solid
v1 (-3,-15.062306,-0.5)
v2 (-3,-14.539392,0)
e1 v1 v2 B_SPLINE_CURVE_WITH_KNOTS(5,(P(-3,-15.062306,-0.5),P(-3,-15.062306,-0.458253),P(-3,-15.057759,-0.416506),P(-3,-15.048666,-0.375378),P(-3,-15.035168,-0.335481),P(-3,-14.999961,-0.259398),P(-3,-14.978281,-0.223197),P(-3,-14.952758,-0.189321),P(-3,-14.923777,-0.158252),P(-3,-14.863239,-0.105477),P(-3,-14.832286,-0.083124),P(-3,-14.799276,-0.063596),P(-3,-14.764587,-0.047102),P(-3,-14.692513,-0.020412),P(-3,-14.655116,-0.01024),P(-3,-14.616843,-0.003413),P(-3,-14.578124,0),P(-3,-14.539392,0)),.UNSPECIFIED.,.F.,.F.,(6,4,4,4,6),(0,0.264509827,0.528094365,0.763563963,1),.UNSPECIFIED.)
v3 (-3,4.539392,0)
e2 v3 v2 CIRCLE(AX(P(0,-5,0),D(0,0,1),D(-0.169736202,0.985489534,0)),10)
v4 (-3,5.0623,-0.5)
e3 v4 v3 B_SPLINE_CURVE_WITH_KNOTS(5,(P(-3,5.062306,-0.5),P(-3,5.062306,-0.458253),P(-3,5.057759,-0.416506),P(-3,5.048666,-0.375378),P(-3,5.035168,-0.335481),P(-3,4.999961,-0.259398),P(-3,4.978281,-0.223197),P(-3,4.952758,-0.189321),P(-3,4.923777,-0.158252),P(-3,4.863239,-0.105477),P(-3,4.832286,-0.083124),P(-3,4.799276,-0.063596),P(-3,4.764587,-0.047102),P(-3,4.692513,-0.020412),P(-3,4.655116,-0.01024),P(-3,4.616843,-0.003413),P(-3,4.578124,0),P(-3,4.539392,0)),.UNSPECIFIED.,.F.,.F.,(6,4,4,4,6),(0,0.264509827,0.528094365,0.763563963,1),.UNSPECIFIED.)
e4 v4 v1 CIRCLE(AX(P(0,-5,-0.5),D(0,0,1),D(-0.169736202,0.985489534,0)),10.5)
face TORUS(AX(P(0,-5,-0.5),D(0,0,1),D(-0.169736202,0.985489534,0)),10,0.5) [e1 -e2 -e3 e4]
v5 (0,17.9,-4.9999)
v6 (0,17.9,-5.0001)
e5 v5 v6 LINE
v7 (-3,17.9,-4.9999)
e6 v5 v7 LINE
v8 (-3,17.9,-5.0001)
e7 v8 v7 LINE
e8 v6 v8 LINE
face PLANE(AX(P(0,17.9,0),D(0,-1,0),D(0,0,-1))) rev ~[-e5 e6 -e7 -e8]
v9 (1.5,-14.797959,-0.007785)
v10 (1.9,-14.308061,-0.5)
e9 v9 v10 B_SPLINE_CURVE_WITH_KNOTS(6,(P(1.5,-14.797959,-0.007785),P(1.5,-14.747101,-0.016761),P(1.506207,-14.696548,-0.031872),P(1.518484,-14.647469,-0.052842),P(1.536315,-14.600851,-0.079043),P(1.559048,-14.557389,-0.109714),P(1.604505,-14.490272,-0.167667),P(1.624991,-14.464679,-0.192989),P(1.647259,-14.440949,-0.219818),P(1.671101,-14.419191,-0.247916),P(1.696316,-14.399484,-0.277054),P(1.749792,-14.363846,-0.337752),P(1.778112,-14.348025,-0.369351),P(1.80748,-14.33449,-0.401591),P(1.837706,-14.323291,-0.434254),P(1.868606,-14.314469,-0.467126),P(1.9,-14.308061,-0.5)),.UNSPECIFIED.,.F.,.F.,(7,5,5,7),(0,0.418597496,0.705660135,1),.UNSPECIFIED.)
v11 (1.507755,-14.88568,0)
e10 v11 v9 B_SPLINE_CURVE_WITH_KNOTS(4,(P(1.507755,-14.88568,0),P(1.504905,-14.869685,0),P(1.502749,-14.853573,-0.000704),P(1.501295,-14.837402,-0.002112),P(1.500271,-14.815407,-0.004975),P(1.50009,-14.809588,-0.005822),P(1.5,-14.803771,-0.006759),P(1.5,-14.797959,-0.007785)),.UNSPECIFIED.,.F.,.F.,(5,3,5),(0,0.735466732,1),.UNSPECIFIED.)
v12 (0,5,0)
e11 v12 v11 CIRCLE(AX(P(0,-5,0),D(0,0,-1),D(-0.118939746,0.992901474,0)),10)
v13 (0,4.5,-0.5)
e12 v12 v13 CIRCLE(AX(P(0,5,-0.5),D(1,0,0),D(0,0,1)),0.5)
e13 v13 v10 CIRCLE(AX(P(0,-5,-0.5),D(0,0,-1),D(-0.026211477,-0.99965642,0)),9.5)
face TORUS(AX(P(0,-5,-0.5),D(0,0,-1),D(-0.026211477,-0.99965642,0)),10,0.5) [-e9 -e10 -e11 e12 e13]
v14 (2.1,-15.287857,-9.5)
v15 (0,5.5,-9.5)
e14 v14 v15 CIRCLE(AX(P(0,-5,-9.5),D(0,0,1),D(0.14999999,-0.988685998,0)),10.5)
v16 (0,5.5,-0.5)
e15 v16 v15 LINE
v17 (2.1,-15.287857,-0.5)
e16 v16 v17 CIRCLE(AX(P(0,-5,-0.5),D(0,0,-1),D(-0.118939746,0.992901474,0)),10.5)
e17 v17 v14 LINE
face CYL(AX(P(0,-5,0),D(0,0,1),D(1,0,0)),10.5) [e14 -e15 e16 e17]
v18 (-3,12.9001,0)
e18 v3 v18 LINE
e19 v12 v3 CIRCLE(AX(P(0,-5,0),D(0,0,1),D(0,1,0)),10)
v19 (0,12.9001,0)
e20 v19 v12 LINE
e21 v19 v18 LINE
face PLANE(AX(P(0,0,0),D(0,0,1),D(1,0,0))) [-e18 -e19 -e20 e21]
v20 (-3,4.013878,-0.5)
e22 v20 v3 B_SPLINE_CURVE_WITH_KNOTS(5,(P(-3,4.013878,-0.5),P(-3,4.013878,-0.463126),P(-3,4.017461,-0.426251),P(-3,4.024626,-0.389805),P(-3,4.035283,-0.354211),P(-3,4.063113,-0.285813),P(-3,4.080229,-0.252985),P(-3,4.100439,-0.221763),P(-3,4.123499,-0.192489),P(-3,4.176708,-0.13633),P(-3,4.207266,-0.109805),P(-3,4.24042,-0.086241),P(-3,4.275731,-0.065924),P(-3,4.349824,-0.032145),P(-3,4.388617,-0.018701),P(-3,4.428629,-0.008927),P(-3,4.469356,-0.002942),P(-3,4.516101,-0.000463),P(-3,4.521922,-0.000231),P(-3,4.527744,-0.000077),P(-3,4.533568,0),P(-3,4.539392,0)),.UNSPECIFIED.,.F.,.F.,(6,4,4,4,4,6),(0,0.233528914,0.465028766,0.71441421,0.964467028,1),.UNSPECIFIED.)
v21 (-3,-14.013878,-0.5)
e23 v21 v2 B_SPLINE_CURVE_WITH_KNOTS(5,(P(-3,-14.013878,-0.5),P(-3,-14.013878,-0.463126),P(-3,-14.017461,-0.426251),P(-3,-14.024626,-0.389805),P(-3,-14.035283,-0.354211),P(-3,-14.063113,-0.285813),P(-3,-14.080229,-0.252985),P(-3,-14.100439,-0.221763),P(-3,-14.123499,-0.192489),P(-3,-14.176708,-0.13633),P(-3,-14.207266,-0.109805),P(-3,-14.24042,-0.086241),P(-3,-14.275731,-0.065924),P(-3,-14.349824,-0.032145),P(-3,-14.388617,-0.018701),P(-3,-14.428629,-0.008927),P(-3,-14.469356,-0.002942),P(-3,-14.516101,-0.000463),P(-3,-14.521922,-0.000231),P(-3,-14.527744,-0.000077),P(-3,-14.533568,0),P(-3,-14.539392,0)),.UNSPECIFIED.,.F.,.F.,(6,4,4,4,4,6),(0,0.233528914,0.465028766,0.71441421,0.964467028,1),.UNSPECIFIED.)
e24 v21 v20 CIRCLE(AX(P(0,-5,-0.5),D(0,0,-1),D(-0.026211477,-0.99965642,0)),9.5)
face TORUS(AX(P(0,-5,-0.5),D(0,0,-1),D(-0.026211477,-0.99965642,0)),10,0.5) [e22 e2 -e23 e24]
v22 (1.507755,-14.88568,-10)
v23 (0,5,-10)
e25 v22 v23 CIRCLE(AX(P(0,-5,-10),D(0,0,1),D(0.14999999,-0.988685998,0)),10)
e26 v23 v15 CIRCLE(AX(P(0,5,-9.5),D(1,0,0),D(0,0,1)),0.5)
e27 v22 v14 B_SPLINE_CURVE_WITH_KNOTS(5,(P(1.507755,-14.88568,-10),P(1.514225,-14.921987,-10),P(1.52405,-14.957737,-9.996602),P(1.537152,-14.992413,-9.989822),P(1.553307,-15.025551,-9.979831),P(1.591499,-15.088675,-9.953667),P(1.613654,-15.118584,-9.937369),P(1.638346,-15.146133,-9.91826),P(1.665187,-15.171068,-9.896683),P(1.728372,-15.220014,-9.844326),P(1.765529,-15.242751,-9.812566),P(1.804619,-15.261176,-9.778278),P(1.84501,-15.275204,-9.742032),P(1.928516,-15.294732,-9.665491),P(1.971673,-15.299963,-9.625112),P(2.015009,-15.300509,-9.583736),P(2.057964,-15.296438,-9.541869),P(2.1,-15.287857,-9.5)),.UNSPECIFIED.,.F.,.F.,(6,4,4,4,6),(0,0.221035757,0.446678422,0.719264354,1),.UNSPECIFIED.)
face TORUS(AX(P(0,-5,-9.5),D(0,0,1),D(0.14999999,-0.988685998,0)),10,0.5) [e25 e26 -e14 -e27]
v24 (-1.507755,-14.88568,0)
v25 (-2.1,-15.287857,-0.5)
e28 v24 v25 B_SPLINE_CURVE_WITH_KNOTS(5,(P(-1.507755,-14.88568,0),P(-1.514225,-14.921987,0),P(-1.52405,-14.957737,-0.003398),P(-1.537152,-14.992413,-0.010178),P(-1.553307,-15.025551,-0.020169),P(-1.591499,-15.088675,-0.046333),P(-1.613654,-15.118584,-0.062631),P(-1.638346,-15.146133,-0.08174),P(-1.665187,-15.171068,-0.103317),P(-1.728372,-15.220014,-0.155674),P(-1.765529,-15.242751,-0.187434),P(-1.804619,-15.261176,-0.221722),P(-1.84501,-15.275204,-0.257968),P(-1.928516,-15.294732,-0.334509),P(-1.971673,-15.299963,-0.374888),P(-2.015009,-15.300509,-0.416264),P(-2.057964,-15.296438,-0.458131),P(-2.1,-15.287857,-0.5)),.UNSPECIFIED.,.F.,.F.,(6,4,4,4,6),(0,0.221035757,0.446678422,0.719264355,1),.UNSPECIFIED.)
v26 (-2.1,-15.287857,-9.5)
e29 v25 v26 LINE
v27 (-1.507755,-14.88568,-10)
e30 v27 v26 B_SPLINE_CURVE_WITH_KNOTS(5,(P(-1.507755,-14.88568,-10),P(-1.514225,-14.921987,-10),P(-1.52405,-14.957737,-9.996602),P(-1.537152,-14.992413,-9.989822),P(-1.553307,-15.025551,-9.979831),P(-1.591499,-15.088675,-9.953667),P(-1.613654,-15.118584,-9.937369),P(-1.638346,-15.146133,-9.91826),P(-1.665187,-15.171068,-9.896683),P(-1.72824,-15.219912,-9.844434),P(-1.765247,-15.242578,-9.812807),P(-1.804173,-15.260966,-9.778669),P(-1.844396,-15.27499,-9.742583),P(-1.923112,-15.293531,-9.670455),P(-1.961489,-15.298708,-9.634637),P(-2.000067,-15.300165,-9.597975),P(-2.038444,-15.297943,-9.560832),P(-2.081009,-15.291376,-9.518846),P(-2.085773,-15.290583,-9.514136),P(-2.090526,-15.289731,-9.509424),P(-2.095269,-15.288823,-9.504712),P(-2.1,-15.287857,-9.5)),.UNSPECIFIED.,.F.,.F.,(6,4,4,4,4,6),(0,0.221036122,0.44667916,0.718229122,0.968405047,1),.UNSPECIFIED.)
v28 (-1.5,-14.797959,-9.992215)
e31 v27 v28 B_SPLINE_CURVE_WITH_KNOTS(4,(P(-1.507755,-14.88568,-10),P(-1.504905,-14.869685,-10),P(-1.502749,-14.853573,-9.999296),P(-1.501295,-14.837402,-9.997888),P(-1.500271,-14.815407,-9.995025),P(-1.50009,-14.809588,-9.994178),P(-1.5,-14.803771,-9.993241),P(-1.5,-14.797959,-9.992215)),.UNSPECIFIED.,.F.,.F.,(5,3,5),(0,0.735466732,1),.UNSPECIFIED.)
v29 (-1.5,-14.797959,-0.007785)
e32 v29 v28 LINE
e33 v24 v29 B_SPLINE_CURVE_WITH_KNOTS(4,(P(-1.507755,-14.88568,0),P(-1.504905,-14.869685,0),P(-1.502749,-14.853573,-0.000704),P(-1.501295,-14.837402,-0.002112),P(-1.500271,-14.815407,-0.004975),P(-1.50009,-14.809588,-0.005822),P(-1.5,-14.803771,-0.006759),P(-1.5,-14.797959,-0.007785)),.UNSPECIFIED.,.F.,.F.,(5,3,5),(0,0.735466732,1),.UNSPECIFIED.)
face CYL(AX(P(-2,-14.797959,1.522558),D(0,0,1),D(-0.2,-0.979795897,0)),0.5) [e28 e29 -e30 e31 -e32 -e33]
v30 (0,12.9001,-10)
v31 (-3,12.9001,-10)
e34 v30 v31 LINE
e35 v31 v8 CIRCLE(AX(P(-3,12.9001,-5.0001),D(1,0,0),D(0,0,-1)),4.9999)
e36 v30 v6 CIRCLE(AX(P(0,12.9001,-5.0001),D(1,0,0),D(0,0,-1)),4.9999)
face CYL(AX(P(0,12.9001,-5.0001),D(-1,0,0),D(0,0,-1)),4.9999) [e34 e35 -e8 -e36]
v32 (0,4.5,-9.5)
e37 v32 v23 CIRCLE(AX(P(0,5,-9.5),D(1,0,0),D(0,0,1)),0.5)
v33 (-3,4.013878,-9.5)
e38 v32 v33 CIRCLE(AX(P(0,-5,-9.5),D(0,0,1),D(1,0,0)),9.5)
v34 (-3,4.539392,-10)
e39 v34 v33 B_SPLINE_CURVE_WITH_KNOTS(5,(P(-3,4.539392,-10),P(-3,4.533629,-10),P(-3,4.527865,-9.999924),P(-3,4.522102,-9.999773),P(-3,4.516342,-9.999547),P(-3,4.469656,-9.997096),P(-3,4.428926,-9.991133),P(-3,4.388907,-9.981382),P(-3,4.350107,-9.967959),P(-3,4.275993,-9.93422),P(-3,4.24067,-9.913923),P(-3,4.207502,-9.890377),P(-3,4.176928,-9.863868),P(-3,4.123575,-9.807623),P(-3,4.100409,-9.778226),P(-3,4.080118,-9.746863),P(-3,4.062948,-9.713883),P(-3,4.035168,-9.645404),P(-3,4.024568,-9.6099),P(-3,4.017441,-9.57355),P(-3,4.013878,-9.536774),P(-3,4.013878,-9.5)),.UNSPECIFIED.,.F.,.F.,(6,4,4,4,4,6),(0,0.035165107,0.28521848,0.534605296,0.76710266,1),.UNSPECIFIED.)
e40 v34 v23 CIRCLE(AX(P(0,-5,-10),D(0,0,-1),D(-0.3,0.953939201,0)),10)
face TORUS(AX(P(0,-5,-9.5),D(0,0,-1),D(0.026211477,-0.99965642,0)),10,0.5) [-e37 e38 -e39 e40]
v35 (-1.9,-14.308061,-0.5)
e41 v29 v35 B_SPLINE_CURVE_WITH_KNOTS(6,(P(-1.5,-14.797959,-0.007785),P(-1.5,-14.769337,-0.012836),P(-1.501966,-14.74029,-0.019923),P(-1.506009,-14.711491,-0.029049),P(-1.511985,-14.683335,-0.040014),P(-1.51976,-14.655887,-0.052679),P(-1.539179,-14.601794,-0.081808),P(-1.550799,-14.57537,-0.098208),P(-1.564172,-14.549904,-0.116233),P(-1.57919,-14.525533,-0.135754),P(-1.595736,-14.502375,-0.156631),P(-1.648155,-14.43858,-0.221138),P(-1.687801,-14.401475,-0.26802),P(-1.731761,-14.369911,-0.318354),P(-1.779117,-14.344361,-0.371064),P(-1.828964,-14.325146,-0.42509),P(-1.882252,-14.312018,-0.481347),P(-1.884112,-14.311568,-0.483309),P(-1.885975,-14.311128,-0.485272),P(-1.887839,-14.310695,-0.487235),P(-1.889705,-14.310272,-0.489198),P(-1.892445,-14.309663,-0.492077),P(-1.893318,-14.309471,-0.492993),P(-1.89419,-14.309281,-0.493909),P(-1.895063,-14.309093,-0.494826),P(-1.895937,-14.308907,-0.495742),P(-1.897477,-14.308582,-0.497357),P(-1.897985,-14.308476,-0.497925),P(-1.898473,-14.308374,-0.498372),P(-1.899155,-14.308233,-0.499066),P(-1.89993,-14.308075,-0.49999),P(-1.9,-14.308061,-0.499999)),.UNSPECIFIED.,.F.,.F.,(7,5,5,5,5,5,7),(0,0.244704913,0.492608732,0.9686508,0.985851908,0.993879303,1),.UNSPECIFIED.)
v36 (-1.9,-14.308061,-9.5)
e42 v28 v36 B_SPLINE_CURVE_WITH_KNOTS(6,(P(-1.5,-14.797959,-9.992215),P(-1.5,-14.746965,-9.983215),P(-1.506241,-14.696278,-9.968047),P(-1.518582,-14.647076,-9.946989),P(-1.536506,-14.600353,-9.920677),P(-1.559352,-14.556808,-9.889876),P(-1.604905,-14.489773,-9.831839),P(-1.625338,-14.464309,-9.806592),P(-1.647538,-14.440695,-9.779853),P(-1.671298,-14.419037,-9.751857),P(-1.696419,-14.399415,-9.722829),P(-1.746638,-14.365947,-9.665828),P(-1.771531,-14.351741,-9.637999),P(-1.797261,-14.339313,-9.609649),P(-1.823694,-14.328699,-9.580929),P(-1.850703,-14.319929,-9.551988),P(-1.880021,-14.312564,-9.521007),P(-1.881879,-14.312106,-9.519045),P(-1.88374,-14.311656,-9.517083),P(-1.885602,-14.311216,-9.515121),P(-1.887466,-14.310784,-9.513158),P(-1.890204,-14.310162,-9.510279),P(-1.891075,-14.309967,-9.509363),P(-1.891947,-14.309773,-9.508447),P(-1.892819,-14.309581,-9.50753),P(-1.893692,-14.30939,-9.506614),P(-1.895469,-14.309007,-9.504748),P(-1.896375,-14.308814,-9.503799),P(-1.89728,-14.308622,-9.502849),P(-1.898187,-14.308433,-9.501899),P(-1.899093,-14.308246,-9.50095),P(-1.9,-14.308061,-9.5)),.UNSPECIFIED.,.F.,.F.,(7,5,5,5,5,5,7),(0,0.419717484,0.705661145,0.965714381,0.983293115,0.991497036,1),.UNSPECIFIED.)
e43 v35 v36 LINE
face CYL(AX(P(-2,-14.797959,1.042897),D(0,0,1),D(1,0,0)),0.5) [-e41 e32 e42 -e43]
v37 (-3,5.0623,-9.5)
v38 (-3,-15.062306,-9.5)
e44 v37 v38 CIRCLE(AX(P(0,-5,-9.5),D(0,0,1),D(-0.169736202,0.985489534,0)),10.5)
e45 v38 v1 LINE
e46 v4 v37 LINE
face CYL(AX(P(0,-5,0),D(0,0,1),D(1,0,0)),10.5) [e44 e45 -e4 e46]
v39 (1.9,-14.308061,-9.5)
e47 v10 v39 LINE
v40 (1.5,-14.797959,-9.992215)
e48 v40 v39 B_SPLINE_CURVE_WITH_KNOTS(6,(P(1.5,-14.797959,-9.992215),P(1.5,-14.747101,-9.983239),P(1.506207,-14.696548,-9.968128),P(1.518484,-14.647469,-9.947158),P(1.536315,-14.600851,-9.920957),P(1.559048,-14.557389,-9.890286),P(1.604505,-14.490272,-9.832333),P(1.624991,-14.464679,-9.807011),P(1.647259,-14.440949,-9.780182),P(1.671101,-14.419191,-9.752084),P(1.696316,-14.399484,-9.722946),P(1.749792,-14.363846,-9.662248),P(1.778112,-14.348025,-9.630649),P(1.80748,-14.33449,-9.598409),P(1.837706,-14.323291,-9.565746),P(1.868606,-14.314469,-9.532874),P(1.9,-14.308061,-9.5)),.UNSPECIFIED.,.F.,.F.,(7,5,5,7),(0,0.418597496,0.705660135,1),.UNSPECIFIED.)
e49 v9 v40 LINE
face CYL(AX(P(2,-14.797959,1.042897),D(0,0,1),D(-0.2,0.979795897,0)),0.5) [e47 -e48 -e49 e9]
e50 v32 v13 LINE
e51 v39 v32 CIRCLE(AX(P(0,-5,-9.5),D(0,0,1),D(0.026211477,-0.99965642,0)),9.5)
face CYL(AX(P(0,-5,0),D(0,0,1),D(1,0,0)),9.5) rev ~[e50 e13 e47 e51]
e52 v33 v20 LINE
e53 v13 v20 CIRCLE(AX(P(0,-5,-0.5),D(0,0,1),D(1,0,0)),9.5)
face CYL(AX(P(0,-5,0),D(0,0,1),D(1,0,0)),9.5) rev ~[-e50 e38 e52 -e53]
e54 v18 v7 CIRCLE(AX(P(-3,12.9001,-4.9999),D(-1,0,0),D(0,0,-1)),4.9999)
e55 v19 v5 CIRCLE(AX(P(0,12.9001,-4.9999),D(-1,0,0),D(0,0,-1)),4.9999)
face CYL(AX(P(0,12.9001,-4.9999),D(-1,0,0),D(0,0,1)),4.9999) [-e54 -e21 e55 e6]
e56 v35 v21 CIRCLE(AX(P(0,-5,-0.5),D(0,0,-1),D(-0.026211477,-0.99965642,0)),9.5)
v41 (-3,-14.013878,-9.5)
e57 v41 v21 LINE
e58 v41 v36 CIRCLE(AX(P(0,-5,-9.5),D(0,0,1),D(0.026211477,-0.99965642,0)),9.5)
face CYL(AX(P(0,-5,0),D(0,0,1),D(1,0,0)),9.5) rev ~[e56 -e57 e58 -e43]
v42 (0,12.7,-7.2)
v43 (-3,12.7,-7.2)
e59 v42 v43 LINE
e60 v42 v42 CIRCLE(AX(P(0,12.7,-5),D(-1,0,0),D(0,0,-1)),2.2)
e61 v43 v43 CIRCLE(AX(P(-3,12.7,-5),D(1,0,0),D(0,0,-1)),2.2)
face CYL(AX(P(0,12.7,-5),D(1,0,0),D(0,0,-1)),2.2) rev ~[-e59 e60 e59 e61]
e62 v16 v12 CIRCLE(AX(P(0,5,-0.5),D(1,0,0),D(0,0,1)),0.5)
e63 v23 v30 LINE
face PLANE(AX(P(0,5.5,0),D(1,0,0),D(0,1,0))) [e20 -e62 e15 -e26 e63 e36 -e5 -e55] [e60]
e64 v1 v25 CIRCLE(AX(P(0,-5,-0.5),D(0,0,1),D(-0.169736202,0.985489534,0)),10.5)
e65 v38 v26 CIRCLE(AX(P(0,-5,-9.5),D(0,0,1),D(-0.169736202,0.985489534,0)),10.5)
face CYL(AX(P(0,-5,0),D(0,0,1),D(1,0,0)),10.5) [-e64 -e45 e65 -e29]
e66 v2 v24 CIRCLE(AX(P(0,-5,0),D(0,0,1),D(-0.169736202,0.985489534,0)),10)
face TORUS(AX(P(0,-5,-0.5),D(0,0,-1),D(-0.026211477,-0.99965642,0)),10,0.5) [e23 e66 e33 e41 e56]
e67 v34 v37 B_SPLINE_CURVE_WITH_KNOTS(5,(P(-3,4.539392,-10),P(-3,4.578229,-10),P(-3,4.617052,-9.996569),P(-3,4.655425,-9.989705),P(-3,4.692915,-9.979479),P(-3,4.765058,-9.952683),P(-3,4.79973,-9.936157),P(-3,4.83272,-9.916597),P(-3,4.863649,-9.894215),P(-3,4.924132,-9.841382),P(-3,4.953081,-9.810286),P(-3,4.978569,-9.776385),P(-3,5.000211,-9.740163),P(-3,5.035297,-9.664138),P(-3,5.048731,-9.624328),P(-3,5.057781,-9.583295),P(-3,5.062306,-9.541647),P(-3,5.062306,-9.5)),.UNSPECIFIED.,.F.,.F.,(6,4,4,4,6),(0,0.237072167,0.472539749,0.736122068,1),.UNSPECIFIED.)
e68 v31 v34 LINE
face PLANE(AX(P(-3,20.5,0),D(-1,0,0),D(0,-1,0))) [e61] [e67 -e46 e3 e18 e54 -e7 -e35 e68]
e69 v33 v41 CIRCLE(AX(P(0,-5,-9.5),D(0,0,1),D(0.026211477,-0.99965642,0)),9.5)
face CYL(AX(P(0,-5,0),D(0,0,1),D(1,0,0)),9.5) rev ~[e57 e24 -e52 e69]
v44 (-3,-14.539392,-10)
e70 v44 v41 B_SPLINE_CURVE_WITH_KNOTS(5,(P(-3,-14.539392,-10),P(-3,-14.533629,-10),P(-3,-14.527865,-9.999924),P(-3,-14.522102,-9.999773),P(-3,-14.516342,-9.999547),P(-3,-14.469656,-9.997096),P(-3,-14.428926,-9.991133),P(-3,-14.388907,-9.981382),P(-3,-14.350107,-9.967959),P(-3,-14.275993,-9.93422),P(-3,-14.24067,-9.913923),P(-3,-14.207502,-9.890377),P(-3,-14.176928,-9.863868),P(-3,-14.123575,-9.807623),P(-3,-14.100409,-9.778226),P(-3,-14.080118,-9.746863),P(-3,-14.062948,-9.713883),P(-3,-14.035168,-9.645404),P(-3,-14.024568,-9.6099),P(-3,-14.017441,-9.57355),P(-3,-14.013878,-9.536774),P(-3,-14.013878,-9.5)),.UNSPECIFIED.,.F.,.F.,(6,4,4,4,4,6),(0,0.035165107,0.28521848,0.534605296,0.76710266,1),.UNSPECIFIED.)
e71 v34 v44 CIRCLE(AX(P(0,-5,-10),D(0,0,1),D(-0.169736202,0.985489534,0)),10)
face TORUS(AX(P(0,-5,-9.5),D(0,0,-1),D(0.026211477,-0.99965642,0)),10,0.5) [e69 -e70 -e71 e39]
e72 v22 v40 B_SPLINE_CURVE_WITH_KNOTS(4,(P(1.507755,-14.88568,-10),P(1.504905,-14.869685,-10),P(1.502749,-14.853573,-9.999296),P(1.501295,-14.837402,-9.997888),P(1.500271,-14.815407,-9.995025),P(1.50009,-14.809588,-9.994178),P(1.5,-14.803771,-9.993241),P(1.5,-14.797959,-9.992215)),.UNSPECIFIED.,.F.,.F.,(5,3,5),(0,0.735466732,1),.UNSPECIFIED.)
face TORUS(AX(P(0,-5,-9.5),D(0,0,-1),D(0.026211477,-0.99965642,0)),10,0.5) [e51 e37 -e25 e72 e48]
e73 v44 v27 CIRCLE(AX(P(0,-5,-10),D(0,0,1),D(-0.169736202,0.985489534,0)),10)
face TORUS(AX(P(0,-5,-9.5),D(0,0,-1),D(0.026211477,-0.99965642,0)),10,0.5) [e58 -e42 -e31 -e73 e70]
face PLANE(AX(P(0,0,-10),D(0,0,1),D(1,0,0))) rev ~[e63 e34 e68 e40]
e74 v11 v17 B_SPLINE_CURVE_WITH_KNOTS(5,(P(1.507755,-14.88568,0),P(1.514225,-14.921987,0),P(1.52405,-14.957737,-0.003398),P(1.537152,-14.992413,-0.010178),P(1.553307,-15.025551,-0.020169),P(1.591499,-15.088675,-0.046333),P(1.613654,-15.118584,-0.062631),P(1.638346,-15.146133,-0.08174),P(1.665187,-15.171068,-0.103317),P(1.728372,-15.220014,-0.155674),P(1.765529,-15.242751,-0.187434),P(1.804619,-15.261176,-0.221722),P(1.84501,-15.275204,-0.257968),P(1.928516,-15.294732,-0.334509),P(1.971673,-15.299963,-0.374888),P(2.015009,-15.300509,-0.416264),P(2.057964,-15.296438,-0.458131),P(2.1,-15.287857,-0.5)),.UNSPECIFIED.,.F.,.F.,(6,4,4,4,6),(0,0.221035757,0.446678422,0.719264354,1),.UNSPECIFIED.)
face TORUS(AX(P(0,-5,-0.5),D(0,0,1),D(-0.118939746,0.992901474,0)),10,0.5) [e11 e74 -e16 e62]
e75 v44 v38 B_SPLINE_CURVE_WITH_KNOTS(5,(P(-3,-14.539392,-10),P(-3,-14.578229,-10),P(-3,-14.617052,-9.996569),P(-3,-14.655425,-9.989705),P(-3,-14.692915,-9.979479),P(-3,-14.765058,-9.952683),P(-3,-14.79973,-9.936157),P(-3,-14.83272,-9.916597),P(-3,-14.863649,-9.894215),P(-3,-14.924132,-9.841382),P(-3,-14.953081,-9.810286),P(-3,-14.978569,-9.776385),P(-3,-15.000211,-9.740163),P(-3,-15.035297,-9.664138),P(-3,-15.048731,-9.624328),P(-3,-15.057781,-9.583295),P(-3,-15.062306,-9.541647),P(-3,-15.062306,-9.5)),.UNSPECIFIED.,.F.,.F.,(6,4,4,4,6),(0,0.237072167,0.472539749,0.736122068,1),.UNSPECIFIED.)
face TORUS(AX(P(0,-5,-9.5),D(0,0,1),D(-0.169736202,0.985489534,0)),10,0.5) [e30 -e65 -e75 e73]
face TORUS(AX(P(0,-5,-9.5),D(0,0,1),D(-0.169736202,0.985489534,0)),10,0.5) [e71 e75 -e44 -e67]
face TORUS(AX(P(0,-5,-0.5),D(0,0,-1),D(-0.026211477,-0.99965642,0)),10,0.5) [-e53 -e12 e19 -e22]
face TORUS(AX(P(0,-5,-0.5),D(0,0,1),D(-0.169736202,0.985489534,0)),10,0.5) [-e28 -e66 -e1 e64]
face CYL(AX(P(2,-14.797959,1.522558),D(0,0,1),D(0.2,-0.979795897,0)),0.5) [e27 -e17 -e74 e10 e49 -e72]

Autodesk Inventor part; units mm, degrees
ref_plane "YZ Plane" through (0, 0, 0) normal (1, 0, 0) x (0, 1, 0)
ref_plane "XZ Plane" through (0, 0, 0) normal (0, 1, 0) x (-1, 0, 0)
ref_plane "XY Plane" through (0, 0, 0) normal (0, 0, 1) x (1, 0, 0)
sketch "Boceto1" plane through (0, 0, 0) normal (0, 0, 1) x (1, 0, 0)
  circle A0 centre (0, -5) radius 10.5
  circle A1 centre (0, -5) radius 9.5
  line L0 (0, 5.5) -> (0, 20.5)
  line L1 (0, 20.5) -> (-3, 20.5)
  line L2 (-3, 20.5) -> (-3, 5.0623)
  line L3 (0, -14.5) -> (1.5, -14.5)
  line L4 (1.5, -14.5) -> (-1.5, -14.5)
  line L5 (-1.5, -14.5) -> (-1.5, -14.3808)
  line L6 (-1.5, -15.5846) -> (-1.5, -14.5)
  line L7 (-1.5, -15.5846) -> (1.5, -15.5846)
  line L8 (1.5, -15.5846) -> (1.5, -14.3808)
  point P0 (0, 0)
  point P1 (-1.5, -15.3923)
  point P2 (1.5, -15.3923)
  dimension "d1" = 19
  dimension "d8" = 21
  dimension "d9" = 15
  dimension "d10" = 3
  dimension "d13" = 1.5
  dimension "d14" = 3
extrude "Extrusión1" add sketch "Boceto1" against normal blind 10 contours A0 L8 A1 L5 L6 | A0 L2 L1 L0
sketch "Boceto2" plane through (0, 5.5, 0) normal (1, 0, 0) x (0, 0, -1)
  line L0 (0, 15) -> (10, 15) projected
  line L1 (0, 0) -> (10, 0)
  line L2 (10, 0) -> (10, 15)
  line L3 (10, 15) -> (0, 15)
  line L4 (0, 15) -> (0, 0)
  line L5 (5, 0) -> (5, 5)
  line L6 (5, 5) -> (5, 15)
  line L7 (5, 5) -> (5, 9.4)
  line L8 (5, 9.4) -> (5, 7.2)
  circle A0 centre (5, 7.2) radius 2.2
  line L9 (5, 9.4) -> (5, 12.4)
  line L10 (5, 12.4) -> (10, 12.4)
  line L11 (0, 12.4) -> (5, 12.4)
  point P0 (0, -5.5)
  dimension "d16" = 15
  dimension "d17" = 10
  dimension "d18" = 5
  dimension "d19" = 4.4
  dimension "d22" = 3
extrude "Extrusión2" cut sketch "Boceto2" against normal blind 10 contours L0 L6 L11 L4 | L0 L2 L10 L6 | A0 L6 | L6 A0
fillet "Empalme1" radius 5 2 edges at (-1.5, 17.9, 0) (-1.5, 17.9, -10)
fillet "Empalme2" radius 0.5 10 edges at (10.473, -4.2481, 0) (-10.4719, -5.7679, 0) (0, 4.5, 0) (10.473, -4.2481, -10) (-10.4719, -5.7679, -10) (0, 4.5, -10) (-1.5, -14.3808, -5) (1.5, -14.3808, -5) (-1.5, -15.3923, -5) (1.5, -15.3923, -5)
properties part number "Anillo_Dedos"
